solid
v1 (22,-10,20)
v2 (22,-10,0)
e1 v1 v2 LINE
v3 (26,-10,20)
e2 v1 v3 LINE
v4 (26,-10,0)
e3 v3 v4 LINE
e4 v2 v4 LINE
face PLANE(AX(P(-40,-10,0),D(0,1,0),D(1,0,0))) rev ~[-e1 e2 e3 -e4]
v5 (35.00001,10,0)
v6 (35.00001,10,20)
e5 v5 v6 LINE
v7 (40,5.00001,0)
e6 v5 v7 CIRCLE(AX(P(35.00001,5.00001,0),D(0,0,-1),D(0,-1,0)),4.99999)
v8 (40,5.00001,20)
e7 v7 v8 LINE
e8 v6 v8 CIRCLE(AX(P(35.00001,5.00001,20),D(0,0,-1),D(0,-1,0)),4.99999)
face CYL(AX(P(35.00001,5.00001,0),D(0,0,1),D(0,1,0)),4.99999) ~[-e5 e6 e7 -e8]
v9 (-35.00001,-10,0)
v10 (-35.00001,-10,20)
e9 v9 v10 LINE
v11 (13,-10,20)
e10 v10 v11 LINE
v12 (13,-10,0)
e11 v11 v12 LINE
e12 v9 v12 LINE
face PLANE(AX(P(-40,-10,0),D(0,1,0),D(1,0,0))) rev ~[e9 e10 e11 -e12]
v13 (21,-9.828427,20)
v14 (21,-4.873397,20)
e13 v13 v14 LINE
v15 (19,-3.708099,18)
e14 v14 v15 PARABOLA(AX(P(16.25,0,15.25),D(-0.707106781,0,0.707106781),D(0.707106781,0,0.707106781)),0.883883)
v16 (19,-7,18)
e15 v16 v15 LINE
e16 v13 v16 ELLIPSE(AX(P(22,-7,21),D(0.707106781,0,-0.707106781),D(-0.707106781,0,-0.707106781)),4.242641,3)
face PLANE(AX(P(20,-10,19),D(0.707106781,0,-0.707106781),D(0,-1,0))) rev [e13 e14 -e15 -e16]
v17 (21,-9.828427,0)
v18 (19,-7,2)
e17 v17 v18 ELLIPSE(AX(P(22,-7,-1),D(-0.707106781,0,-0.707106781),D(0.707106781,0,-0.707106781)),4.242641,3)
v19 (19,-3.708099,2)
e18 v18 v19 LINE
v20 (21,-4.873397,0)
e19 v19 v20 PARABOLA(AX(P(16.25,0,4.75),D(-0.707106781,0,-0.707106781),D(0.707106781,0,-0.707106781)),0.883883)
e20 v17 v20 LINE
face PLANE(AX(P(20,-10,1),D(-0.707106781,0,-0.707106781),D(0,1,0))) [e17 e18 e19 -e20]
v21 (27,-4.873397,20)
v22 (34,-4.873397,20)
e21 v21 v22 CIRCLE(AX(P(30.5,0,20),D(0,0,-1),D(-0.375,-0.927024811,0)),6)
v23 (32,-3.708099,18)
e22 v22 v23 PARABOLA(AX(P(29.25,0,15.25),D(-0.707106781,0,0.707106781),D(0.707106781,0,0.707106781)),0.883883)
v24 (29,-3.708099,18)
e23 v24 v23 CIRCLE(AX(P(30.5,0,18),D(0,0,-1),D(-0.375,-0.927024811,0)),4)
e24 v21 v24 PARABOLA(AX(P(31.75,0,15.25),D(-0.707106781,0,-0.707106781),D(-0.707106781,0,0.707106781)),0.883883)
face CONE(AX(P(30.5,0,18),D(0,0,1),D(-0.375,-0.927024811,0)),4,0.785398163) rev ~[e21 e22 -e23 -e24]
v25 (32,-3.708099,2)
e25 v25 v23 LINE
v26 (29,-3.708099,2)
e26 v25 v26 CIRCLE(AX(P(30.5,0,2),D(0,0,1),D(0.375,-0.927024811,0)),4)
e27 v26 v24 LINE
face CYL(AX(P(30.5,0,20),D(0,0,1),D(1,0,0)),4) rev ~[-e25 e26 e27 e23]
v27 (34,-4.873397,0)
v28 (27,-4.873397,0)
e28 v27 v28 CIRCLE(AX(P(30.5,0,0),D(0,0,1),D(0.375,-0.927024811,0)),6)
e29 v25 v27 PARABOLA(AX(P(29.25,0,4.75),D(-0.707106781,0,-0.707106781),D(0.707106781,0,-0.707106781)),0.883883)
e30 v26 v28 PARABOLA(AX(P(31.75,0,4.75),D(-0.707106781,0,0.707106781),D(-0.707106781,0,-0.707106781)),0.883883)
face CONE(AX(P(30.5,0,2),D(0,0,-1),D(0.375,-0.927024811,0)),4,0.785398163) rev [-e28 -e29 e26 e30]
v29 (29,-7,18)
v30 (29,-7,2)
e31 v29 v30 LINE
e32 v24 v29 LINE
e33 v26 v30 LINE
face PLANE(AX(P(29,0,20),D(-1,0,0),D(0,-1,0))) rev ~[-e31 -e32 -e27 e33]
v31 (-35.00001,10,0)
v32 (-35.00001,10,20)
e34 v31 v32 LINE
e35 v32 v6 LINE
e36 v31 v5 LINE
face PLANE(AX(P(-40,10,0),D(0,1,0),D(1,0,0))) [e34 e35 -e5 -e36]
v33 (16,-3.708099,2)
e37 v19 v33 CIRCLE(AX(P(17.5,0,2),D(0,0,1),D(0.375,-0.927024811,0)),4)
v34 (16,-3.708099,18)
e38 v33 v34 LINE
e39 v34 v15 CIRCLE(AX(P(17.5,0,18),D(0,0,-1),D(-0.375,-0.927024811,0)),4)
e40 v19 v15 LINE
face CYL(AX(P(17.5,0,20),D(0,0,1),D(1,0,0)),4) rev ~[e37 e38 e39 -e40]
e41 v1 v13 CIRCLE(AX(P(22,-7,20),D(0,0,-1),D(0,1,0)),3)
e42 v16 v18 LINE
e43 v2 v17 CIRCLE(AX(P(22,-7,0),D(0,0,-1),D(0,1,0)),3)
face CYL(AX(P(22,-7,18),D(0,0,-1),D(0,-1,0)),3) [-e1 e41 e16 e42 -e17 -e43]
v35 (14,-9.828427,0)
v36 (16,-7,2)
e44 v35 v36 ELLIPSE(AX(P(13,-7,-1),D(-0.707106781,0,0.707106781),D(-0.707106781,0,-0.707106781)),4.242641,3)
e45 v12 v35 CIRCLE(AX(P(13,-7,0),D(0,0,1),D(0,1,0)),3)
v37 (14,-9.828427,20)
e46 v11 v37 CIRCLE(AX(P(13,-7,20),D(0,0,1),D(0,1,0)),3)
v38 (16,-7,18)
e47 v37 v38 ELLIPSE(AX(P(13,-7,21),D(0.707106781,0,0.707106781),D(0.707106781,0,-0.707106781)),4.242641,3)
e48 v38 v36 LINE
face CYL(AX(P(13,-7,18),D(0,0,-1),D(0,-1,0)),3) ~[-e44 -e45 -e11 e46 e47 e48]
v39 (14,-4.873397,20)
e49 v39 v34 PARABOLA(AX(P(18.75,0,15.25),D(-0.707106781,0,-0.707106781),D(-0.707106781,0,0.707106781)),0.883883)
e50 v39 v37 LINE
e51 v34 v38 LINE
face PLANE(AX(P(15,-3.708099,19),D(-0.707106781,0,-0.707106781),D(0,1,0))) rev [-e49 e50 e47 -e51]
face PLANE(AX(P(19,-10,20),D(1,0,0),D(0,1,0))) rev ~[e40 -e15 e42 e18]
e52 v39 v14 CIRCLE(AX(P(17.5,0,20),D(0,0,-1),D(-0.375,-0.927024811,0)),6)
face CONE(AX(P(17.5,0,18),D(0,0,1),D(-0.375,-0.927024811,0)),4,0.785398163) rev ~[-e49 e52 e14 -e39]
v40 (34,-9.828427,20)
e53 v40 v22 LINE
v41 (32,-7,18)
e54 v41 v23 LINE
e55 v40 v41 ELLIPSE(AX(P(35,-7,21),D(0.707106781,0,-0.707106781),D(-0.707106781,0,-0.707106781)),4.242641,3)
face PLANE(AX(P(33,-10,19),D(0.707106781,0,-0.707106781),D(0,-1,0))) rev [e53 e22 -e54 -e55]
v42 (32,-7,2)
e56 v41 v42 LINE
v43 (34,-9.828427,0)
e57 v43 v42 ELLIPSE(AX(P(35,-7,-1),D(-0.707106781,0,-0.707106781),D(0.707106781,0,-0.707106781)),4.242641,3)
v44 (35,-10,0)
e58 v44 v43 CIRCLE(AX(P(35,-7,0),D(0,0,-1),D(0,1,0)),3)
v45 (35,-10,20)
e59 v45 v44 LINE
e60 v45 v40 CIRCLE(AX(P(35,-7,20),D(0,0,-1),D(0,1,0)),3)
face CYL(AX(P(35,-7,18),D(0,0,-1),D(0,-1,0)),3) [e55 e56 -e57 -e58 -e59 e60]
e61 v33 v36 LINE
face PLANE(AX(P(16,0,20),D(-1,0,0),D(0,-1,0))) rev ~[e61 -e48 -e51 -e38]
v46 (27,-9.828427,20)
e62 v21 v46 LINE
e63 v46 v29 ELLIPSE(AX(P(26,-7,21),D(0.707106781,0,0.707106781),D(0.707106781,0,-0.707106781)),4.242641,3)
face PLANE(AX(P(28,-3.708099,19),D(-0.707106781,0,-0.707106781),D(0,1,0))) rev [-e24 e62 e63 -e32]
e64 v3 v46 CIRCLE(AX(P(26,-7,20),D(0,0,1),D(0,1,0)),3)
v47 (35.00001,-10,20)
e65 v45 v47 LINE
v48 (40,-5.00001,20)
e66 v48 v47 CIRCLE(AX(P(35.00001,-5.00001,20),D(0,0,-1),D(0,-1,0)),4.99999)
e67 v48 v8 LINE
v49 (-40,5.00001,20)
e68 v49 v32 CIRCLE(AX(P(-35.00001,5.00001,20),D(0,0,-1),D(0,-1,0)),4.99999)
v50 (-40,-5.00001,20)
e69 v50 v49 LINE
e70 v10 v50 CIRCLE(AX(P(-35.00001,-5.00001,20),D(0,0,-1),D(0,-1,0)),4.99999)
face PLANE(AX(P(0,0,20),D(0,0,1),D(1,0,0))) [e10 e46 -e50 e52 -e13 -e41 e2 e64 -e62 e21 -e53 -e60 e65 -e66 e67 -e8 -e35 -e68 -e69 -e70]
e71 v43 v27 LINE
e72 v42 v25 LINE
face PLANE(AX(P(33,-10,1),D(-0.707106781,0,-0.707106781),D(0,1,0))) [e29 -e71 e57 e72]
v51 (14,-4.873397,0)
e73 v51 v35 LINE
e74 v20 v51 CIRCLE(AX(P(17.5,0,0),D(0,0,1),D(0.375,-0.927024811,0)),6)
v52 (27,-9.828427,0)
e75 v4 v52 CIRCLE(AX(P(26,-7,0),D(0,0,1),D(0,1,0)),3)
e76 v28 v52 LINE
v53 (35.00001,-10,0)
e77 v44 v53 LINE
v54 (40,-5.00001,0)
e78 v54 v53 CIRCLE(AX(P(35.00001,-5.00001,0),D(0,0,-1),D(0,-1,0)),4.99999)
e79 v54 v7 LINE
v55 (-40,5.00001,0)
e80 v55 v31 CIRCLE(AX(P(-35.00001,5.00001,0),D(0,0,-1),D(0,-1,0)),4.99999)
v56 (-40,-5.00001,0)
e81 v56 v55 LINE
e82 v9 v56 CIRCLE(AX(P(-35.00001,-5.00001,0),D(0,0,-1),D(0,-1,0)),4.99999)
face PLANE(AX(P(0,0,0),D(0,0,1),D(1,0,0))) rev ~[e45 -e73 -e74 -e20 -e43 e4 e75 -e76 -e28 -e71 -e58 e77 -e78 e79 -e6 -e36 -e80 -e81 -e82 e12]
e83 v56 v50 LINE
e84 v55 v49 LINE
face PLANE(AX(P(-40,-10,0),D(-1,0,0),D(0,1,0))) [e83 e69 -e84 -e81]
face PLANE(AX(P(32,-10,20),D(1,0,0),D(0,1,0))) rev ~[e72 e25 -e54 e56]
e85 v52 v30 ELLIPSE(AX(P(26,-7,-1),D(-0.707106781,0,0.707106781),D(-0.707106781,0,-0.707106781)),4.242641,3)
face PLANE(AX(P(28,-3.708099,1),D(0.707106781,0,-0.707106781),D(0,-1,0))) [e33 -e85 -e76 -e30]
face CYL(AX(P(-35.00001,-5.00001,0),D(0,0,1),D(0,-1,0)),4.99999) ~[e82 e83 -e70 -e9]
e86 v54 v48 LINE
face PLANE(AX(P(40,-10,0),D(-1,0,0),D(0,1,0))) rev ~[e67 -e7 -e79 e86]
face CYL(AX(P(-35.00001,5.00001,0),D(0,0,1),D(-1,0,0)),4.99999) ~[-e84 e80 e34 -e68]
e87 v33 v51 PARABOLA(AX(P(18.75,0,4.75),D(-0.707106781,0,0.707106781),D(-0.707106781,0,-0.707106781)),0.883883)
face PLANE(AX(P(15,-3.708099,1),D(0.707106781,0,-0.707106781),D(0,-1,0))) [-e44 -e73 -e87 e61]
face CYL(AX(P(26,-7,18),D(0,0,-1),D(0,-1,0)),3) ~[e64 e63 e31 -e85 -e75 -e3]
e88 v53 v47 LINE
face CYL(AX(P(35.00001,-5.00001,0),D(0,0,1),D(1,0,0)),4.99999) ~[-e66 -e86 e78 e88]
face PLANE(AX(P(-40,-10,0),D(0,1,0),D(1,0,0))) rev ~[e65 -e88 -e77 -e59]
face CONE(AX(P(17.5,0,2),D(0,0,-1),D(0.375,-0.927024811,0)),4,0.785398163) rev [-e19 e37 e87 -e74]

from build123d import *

# Parameters (mm, degrees)
F0_W     = 80
F0_H     = 20
F1_DEPTH = 20
F3_DEPTH = 20.001
F4_R     = 4
F5_DEPTH = 20.001
F6_SIZE  = 2
F7_R     = 3
F8_R     = 4.99999


# Not quite as in the source:
# - a fillet or chamfer is up to 0.001 mm smaller than in the source, because OpenCascade refuses the exact size


with BuildPart() as f1:
    # F0 (on Top) → F1 (new body)
    with BuildSketch(Plane.XY):
        Rectangle(F0_W, F0_H)
    extrude(amount=F1_DEPTH)

    # F2 (on face) → F3 (cut, through all)
    with BuildSketch(Plane.XY.offset(20)):
        with BuildLine():
            Line((29, -10), (32, -10))
            Line((32, -10), (32, 0))
            ThreePointArc((32, 0), (30.5, 1.5), (29, 0))
            Line((29, 0), (29, -10))
        make_face()
        with BuildLine():
            Line((16, -10), (19, -10))
            Line((19, -10), (19, 0))
            ThreePointArc((19, 0), (17.5, 1.5), (16, 0))
            Line((16, 0), (16, -10))
        make_face()
    extrude(amount=-F3_DEPTH, mode=Mode.SUBTRACT)

    # F4 (on face) → F5 (cut, through all)
    with BuildSketch(Plane.XY.offset(20)):
        with Locations((17.5, 0)):
            Circle(F4_R)
        with Locations((30.5, 0)):
            Circle(F4_R)
    extrude(amount=-F5_DEPTH, mode=Mode.SUBTRACT)

    # F6
    f6_edges = [f1.edges().sort_by_distance(p)[0] for p in [
        (17.5, 4, 20),
        (30.5, 4, 20),
        (17.5, 4, 0),
        (30.5, 4, 0),
        (16, -6.85405, 20),
        (19, -6.85405, 20),
        (29, -6.85405, 20),
        (32, -6.85405, 20),
        (16, -6.85405, 0),
        (19, -6.85405, 0),
        (29, -6.85405, 0),
        (32, -6.85405, 0),
    ]]
    chamfer(f6_edges, length=F6_SIZE)

    # F7
    f7_edges = [f1.edges().sort_by_distance(p)[0] for p in [
        (19, -10, 10),
        (29, -10, 10),
        (32, -10, 10),
        (16, -10, 10),
    ]]
    fillet(f7_edges, radius=F7_R)

    # F8 (radius 5 in the source; OpenCascade refuses exactly that, so slightly less here)
    f8_edges = [f1.edges().sort_by_distance(p)[0] for p in [
        (40, -10, 10),
        (40, 10, 10),
        (-40, 10, 10),
        (-40, -10, 10),
    ]]
    fillet(f8_edges, radius=F8_R)


solid = f1.part
